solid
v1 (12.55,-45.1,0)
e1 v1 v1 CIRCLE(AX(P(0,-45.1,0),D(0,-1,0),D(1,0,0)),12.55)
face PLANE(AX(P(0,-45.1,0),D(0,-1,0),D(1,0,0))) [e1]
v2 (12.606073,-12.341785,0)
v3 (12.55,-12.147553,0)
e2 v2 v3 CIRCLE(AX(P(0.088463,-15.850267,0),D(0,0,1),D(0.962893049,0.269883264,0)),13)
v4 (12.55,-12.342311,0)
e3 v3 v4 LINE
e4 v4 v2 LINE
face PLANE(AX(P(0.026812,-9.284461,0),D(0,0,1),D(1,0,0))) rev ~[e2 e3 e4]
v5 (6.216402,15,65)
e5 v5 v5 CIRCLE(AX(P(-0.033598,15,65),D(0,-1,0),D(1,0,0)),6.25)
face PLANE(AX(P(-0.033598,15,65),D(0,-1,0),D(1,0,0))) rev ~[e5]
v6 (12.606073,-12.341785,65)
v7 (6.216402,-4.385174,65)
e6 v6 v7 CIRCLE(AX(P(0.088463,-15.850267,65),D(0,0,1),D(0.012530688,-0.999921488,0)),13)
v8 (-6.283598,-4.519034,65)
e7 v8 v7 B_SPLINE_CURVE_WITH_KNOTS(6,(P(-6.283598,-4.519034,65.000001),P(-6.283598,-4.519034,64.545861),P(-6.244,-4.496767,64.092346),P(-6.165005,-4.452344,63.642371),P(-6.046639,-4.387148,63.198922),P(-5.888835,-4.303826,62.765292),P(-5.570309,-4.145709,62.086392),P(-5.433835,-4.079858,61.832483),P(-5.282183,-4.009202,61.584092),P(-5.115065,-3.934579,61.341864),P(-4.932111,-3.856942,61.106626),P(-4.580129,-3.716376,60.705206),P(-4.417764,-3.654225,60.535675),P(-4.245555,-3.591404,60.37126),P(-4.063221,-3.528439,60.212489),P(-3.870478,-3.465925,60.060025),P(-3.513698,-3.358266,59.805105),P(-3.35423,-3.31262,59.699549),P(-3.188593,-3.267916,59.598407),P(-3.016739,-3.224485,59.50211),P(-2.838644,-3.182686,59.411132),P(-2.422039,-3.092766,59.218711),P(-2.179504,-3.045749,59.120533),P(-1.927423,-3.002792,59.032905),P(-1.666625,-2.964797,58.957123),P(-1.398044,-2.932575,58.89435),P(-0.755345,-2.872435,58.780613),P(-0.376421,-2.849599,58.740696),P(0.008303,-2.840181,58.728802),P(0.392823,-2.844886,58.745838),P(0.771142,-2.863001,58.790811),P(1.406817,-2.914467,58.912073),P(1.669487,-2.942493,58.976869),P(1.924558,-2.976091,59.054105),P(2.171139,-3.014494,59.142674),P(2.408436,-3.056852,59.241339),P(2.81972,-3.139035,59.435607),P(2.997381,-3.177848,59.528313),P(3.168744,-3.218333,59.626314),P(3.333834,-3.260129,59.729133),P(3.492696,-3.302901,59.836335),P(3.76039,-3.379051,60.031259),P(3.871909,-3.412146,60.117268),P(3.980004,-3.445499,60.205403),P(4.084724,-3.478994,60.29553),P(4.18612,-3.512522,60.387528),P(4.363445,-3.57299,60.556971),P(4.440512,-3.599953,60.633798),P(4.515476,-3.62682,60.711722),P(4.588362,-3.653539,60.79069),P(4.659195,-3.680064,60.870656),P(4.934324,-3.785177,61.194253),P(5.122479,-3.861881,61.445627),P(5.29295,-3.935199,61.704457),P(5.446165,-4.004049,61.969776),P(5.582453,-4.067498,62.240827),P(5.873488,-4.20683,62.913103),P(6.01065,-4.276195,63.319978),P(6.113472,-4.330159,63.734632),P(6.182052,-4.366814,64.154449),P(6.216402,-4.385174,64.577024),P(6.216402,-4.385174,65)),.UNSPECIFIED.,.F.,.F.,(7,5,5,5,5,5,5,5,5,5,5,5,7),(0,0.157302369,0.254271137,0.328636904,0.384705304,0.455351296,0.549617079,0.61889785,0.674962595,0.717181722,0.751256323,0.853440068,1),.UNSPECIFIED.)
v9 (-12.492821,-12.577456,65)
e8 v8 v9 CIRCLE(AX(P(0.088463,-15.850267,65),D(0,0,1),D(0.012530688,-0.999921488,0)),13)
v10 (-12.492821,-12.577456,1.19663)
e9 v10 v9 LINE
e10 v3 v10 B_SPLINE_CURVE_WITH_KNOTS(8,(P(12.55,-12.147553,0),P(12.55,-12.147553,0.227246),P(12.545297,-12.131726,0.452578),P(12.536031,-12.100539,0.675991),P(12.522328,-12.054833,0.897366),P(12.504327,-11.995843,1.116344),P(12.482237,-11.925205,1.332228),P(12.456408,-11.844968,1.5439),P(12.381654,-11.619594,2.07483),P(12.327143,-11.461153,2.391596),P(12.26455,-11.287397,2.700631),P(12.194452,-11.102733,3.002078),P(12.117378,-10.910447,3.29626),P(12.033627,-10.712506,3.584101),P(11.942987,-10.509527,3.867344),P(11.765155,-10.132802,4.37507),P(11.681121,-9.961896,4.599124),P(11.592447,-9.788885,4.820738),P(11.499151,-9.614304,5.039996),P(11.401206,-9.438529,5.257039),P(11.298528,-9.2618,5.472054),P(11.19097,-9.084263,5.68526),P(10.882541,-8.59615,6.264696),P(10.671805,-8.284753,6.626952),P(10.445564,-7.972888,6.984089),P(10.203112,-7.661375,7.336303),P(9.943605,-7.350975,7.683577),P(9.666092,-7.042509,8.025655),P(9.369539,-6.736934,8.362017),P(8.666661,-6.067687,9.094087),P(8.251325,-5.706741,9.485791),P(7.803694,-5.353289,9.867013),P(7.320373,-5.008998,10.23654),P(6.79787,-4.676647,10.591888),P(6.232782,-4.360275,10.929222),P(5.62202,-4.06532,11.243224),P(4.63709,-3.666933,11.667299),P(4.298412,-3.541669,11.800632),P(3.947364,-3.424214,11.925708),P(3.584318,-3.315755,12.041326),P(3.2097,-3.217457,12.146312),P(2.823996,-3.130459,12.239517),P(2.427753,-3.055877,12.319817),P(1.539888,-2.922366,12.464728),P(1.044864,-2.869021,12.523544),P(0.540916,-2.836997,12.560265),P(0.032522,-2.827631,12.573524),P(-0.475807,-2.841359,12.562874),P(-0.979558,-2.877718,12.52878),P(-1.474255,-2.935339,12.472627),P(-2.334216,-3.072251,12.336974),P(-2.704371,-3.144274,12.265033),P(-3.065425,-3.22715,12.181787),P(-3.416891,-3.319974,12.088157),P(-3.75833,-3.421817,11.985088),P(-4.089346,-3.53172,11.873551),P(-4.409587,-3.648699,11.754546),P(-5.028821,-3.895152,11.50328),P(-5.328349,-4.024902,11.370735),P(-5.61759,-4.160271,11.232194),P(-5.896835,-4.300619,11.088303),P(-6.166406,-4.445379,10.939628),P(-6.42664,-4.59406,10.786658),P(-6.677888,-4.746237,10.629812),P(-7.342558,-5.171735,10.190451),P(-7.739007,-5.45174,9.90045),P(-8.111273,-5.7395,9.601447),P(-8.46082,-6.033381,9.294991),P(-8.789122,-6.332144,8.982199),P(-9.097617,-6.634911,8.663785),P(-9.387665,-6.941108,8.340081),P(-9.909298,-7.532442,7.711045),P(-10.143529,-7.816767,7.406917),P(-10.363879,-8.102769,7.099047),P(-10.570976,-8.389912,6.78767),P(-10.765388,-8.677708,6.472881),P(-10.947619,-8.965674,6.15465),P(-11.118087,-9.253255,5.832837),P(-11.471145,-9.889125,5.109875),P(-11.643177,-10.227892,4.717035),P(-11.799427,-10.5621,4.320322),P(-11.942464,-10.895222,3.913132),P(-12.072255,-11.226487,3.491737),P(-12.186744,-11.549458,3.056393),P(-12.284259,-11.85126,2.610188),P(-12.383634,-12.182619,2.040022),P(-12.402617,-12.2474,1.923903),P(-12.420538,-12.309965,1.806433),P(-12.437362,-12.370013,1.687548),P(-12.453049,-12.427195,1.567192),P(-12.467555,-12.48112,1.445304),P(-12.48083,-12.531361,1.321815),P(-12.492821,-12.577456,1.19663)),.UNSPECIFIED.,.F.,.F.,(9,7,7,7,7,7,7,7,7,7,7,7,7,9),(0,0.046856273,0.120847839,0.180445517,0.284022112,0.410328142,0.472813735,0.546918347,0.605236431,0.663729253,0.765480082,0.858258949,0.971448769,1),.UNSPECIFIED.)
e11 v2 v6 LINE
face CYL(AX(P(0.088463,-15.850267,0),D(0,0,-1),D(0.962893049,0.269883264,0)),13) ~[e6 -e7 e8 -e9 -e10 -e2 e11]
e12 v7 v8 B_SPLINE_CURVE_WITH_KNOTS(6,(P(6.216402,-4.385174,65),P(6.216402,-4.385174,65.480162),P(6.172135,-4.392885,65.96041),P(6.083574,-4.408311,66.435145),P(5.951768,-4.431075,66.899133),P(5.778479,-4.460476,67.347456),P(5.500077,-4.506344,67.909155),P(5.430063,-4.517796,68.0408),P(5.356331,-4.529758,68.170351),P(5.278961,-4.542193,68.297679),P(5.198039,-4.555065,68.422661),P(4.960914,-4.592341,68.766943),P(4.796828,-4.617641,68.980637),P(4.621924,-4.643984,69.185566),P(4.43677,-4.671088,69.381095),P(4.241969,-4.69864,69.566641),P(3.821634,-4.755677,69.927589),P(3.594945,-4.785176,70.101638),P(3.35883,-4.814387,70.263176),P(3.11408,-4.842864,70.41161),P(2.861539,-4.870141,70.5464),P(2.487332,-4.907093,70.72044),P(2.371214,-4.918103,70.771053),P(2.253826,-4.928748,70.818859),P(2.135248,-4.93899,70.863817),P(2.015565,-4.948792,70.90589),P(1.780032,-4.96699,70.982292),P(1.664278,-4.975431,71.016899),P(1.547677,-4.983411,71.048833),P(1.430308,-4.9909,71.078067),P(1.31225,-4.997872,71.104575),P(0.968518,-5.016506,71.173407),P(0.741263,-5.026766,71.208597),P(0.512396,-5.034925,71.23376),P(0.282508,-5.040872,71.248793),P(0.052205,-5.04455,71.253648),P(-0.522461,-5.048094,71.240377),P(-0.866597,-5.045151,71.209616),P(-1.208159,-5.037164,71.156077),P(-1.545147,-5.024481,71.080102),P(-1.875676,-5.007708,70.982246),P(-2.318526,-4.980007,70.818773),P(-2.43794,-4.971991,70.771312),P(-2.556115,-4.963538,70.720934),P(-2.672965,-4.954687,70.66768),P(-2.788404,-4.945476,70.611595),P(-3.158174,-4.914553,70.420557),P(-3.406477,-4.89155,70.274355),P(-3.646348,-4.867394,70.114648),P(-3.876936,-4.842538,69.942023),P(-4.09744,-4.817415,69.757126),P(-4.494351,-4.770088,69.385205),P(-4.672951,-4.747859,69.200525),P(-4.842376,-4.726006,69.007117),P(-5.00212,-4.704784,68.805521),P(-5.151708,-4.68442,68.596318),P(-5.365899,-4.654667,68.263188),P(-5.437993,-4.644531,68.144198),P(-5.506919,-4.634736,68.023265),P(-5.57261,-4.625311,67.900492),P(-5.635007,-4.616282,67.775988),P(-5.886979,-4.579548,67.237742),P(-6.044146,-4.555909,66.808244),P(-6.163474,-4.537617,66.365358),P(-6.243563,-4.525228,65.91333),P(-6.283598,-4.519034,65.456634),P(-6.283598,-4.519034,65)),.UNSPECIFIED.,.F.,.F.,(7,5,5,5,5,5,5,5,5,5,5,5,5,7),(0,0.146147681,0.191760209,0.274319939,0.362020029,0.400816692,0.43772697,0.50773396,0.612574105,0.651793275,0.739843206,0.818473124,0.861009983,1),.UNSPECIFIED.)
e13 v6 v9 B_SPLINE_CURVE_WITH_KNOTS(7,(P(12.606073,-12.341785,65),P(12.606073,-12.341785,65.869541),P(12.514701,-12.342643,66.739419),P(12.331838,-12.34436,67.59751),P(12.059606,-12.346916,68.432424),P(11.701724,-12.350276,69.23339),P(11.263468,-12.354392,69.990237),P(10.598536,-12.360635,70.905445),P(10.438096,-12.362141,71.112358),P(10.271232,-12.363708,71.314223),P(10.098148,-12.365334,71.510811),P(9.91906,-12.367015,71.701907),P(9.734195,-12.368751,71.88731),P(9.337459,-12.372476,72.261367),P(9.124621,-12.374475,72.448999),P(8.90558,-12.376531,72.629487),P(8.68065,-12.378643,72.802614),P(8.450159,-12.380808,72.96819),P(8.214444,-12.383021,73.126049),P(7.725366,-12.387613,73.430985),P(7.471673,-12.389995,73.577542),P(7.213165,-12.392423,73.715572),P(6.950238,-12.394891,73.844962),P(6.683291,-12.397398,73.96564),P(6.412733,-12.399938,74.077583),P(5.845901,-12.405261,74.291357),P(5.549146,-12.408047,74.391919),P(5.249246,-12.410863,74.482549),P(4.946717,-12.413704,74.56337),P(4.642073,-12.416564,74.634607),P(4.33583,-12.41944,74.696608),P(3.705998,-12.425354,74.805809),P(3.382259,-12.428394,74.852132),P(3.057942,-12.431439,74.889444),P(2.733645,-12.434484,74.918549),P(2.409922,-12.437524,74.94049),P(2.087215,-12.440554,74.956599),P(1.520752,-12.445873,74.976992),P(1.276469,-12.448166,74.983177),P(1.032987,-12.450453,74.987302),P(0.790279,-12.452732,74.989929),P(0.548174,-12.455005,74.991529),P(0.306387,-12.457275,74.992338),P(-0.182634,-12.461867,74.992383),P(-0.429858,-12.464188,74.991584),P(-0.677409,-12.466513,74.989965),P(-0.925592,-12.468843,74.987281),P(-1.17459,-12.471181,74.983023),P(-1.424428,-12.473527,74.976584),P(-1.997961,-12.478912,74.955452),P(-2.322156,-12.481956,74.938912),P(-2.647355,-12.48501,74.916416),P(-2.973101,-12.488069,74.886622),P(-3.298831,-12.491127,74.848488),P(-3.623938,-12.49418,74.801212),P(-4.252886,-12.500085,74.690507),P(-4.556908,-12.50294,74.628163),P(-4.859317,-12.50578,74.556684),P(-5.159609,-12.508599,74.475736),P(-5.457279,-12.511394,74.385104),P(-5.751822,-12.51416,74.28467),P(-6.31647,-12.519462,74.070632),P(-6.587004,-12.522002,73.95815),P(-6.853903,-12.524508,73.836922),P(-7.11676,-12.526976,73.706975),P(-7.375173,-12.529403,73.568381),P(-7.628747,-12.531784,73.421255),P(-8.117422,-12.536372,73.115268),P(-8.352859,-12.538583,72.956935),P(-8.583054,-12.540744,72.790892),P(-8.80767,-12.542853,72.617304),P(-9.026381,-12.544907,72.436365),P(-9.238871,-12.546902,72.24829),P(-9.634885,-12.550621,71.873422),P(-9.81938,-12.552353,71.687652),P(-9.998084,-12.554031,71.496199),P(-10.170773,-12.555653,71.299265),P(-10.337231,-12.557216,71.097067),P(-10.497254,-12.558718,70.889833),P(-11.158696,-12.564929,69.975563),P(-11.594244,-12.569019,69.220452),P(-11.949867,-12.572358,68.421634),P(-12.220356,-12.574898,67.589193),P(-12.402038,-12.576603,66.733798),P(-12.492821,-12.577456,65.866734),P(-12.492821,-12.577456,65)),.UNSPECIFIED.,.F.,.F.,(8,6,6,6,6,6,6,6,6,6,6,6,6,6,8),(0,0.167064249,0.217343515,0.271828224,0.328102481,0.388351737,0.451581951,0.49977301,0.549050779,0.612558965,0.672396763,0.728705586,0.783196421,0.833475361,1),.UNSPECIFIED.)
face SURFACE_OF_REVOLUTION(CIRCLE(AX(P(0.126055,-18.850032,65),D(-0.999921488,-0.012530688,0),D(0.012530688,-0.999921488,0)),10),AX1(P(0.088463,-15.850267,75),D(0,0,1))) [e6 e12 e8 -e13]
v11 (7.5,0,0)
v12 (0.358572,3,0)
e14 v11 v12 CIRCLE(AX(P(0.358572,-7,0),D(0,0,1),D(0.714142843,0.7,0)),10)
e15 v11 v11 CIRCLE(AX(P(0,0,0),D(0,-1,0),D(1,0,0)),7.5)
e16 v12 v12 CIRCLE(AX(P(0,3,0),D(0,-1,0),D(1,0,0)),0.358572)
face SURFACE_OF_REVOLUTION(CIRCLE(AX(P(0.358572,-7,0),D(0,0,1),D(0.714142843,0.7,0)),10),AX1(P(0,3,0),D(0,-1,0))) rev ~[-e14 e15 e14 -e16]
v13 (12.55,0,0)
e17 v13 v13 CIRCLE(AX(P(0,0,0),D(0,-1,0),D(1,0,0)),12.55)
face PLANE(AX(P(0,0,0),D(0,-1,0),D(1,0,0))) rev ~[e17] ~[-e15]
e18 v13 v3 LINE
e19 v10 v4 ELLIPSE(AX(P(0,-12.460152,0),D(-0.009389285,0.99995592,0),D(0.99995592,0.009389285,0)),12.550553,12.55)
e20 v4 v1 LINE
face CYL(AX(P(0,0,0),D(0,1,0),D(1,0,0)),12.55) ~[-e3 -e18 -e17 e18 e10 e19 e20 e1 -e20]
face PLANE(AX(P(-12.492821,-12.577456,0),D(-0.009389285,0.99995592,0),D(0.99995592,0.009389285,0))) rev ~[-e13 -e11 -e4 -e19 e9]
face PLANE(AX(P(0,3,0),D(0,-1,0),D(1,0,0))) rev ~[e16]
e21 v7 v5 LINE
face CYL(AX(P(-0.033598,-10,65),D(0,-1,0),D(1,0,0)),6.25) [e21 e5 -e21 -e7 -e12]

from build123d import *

# Parameters (mm, degrees)
F0_R        = 12.55
F1_DEPTH    = 45.1
F2_R        = 7.5
F3_DEPTH    = 3
F6_DEPTH    = 75
F7_T2_ANGLE = 359.64
F9_R        = 6.25
F10_DEPTH   = 25


# Not quite as in the source:
# - a fillet or chamfer that OpenCascade refuses, or shapes differently, is made with other operations: its cross-section is extruded or revolved along the edge and cut away or added


with BuildPart() as f1:
    # F0 (on Front) → F1 (new body)
    with BuildSketch(Plane.XZ):
        Circle(F0_R)
    extrude(amount=F1_DEPTH)

    # F2 (on Front) → F3 (join)
    with BuildSketch(Plane.XZ):
        Circle(F2_R)
    extrude(amount=-F3_DEPTH)

    # F4: fillet of radius 10 on 1 edges, made by hand

    # F4_s1 → F4_t2 (revolve, cut)
    with BuildSketch(Plane.XY):
        with BuildLine():
            ThreePointArc((7.5, 0), (4.2315549177, 2.2195444573), (0.3585715715, 3))
            Line((0.3585715715, 3), (7.5, 3))
            Line((7.5, 3), (7.5, 0))
        make_face()
    revolve(axis=Axis((0, 3, 0), (0, -1, 0)), mode=Mode.SUBTRACT)

    # F5 (on Top) → F6 (join)
    with BuildSketch(Plane.XY):
        with BuildLine():
            Line((-12.4928209826, -12.5774559094), (12.6060726016, -12.3417848491))
            ThreePointArc((12.6060726016, -12.3417848491), (-0.0335977446, -2.8508403226), (-12.4928209826, -12.5774559094))
        make_face()
    extrude(amount=F6_DEPTH)

    # F7: fillet of radius 10 on 1 edges, made by hand

    # F7_s1 → F7_t2 (revolve, cut)
    with BuildSketch(Plane(origin=(-0.1101500857, -0.0013803647, 0), x_dir=(0, 0, 1), z_dir=(-0.9999214878, -0.0125306879, 0))):
        with BuildLine():
            ThreePointArc((65, -28.8501313418), (72.0710678119, -25.9211991536), (75, -18.8501313418))
            Line((75, -18.8501313418), (75, -28.8501313418))
            Line((75, -28.8501313418), (65, -28.8501313418))
        make_face()
    revolve(axis=Axis((0.0884629639, -15.8502672786, 75), (0, 0, 1)), revolution_arc=F7_T2_ANGLE, mode=Mode.SUBTRACT)

    # F9 (on offset) → F10 (join)
    with BuildSketch(Plane.XZ.offset(10)):
        with Locations((-0.0335977446, 65)):
            Circle(F9_R)
    extrude(amount=-F10_DEPTH)


solid = f1.part
